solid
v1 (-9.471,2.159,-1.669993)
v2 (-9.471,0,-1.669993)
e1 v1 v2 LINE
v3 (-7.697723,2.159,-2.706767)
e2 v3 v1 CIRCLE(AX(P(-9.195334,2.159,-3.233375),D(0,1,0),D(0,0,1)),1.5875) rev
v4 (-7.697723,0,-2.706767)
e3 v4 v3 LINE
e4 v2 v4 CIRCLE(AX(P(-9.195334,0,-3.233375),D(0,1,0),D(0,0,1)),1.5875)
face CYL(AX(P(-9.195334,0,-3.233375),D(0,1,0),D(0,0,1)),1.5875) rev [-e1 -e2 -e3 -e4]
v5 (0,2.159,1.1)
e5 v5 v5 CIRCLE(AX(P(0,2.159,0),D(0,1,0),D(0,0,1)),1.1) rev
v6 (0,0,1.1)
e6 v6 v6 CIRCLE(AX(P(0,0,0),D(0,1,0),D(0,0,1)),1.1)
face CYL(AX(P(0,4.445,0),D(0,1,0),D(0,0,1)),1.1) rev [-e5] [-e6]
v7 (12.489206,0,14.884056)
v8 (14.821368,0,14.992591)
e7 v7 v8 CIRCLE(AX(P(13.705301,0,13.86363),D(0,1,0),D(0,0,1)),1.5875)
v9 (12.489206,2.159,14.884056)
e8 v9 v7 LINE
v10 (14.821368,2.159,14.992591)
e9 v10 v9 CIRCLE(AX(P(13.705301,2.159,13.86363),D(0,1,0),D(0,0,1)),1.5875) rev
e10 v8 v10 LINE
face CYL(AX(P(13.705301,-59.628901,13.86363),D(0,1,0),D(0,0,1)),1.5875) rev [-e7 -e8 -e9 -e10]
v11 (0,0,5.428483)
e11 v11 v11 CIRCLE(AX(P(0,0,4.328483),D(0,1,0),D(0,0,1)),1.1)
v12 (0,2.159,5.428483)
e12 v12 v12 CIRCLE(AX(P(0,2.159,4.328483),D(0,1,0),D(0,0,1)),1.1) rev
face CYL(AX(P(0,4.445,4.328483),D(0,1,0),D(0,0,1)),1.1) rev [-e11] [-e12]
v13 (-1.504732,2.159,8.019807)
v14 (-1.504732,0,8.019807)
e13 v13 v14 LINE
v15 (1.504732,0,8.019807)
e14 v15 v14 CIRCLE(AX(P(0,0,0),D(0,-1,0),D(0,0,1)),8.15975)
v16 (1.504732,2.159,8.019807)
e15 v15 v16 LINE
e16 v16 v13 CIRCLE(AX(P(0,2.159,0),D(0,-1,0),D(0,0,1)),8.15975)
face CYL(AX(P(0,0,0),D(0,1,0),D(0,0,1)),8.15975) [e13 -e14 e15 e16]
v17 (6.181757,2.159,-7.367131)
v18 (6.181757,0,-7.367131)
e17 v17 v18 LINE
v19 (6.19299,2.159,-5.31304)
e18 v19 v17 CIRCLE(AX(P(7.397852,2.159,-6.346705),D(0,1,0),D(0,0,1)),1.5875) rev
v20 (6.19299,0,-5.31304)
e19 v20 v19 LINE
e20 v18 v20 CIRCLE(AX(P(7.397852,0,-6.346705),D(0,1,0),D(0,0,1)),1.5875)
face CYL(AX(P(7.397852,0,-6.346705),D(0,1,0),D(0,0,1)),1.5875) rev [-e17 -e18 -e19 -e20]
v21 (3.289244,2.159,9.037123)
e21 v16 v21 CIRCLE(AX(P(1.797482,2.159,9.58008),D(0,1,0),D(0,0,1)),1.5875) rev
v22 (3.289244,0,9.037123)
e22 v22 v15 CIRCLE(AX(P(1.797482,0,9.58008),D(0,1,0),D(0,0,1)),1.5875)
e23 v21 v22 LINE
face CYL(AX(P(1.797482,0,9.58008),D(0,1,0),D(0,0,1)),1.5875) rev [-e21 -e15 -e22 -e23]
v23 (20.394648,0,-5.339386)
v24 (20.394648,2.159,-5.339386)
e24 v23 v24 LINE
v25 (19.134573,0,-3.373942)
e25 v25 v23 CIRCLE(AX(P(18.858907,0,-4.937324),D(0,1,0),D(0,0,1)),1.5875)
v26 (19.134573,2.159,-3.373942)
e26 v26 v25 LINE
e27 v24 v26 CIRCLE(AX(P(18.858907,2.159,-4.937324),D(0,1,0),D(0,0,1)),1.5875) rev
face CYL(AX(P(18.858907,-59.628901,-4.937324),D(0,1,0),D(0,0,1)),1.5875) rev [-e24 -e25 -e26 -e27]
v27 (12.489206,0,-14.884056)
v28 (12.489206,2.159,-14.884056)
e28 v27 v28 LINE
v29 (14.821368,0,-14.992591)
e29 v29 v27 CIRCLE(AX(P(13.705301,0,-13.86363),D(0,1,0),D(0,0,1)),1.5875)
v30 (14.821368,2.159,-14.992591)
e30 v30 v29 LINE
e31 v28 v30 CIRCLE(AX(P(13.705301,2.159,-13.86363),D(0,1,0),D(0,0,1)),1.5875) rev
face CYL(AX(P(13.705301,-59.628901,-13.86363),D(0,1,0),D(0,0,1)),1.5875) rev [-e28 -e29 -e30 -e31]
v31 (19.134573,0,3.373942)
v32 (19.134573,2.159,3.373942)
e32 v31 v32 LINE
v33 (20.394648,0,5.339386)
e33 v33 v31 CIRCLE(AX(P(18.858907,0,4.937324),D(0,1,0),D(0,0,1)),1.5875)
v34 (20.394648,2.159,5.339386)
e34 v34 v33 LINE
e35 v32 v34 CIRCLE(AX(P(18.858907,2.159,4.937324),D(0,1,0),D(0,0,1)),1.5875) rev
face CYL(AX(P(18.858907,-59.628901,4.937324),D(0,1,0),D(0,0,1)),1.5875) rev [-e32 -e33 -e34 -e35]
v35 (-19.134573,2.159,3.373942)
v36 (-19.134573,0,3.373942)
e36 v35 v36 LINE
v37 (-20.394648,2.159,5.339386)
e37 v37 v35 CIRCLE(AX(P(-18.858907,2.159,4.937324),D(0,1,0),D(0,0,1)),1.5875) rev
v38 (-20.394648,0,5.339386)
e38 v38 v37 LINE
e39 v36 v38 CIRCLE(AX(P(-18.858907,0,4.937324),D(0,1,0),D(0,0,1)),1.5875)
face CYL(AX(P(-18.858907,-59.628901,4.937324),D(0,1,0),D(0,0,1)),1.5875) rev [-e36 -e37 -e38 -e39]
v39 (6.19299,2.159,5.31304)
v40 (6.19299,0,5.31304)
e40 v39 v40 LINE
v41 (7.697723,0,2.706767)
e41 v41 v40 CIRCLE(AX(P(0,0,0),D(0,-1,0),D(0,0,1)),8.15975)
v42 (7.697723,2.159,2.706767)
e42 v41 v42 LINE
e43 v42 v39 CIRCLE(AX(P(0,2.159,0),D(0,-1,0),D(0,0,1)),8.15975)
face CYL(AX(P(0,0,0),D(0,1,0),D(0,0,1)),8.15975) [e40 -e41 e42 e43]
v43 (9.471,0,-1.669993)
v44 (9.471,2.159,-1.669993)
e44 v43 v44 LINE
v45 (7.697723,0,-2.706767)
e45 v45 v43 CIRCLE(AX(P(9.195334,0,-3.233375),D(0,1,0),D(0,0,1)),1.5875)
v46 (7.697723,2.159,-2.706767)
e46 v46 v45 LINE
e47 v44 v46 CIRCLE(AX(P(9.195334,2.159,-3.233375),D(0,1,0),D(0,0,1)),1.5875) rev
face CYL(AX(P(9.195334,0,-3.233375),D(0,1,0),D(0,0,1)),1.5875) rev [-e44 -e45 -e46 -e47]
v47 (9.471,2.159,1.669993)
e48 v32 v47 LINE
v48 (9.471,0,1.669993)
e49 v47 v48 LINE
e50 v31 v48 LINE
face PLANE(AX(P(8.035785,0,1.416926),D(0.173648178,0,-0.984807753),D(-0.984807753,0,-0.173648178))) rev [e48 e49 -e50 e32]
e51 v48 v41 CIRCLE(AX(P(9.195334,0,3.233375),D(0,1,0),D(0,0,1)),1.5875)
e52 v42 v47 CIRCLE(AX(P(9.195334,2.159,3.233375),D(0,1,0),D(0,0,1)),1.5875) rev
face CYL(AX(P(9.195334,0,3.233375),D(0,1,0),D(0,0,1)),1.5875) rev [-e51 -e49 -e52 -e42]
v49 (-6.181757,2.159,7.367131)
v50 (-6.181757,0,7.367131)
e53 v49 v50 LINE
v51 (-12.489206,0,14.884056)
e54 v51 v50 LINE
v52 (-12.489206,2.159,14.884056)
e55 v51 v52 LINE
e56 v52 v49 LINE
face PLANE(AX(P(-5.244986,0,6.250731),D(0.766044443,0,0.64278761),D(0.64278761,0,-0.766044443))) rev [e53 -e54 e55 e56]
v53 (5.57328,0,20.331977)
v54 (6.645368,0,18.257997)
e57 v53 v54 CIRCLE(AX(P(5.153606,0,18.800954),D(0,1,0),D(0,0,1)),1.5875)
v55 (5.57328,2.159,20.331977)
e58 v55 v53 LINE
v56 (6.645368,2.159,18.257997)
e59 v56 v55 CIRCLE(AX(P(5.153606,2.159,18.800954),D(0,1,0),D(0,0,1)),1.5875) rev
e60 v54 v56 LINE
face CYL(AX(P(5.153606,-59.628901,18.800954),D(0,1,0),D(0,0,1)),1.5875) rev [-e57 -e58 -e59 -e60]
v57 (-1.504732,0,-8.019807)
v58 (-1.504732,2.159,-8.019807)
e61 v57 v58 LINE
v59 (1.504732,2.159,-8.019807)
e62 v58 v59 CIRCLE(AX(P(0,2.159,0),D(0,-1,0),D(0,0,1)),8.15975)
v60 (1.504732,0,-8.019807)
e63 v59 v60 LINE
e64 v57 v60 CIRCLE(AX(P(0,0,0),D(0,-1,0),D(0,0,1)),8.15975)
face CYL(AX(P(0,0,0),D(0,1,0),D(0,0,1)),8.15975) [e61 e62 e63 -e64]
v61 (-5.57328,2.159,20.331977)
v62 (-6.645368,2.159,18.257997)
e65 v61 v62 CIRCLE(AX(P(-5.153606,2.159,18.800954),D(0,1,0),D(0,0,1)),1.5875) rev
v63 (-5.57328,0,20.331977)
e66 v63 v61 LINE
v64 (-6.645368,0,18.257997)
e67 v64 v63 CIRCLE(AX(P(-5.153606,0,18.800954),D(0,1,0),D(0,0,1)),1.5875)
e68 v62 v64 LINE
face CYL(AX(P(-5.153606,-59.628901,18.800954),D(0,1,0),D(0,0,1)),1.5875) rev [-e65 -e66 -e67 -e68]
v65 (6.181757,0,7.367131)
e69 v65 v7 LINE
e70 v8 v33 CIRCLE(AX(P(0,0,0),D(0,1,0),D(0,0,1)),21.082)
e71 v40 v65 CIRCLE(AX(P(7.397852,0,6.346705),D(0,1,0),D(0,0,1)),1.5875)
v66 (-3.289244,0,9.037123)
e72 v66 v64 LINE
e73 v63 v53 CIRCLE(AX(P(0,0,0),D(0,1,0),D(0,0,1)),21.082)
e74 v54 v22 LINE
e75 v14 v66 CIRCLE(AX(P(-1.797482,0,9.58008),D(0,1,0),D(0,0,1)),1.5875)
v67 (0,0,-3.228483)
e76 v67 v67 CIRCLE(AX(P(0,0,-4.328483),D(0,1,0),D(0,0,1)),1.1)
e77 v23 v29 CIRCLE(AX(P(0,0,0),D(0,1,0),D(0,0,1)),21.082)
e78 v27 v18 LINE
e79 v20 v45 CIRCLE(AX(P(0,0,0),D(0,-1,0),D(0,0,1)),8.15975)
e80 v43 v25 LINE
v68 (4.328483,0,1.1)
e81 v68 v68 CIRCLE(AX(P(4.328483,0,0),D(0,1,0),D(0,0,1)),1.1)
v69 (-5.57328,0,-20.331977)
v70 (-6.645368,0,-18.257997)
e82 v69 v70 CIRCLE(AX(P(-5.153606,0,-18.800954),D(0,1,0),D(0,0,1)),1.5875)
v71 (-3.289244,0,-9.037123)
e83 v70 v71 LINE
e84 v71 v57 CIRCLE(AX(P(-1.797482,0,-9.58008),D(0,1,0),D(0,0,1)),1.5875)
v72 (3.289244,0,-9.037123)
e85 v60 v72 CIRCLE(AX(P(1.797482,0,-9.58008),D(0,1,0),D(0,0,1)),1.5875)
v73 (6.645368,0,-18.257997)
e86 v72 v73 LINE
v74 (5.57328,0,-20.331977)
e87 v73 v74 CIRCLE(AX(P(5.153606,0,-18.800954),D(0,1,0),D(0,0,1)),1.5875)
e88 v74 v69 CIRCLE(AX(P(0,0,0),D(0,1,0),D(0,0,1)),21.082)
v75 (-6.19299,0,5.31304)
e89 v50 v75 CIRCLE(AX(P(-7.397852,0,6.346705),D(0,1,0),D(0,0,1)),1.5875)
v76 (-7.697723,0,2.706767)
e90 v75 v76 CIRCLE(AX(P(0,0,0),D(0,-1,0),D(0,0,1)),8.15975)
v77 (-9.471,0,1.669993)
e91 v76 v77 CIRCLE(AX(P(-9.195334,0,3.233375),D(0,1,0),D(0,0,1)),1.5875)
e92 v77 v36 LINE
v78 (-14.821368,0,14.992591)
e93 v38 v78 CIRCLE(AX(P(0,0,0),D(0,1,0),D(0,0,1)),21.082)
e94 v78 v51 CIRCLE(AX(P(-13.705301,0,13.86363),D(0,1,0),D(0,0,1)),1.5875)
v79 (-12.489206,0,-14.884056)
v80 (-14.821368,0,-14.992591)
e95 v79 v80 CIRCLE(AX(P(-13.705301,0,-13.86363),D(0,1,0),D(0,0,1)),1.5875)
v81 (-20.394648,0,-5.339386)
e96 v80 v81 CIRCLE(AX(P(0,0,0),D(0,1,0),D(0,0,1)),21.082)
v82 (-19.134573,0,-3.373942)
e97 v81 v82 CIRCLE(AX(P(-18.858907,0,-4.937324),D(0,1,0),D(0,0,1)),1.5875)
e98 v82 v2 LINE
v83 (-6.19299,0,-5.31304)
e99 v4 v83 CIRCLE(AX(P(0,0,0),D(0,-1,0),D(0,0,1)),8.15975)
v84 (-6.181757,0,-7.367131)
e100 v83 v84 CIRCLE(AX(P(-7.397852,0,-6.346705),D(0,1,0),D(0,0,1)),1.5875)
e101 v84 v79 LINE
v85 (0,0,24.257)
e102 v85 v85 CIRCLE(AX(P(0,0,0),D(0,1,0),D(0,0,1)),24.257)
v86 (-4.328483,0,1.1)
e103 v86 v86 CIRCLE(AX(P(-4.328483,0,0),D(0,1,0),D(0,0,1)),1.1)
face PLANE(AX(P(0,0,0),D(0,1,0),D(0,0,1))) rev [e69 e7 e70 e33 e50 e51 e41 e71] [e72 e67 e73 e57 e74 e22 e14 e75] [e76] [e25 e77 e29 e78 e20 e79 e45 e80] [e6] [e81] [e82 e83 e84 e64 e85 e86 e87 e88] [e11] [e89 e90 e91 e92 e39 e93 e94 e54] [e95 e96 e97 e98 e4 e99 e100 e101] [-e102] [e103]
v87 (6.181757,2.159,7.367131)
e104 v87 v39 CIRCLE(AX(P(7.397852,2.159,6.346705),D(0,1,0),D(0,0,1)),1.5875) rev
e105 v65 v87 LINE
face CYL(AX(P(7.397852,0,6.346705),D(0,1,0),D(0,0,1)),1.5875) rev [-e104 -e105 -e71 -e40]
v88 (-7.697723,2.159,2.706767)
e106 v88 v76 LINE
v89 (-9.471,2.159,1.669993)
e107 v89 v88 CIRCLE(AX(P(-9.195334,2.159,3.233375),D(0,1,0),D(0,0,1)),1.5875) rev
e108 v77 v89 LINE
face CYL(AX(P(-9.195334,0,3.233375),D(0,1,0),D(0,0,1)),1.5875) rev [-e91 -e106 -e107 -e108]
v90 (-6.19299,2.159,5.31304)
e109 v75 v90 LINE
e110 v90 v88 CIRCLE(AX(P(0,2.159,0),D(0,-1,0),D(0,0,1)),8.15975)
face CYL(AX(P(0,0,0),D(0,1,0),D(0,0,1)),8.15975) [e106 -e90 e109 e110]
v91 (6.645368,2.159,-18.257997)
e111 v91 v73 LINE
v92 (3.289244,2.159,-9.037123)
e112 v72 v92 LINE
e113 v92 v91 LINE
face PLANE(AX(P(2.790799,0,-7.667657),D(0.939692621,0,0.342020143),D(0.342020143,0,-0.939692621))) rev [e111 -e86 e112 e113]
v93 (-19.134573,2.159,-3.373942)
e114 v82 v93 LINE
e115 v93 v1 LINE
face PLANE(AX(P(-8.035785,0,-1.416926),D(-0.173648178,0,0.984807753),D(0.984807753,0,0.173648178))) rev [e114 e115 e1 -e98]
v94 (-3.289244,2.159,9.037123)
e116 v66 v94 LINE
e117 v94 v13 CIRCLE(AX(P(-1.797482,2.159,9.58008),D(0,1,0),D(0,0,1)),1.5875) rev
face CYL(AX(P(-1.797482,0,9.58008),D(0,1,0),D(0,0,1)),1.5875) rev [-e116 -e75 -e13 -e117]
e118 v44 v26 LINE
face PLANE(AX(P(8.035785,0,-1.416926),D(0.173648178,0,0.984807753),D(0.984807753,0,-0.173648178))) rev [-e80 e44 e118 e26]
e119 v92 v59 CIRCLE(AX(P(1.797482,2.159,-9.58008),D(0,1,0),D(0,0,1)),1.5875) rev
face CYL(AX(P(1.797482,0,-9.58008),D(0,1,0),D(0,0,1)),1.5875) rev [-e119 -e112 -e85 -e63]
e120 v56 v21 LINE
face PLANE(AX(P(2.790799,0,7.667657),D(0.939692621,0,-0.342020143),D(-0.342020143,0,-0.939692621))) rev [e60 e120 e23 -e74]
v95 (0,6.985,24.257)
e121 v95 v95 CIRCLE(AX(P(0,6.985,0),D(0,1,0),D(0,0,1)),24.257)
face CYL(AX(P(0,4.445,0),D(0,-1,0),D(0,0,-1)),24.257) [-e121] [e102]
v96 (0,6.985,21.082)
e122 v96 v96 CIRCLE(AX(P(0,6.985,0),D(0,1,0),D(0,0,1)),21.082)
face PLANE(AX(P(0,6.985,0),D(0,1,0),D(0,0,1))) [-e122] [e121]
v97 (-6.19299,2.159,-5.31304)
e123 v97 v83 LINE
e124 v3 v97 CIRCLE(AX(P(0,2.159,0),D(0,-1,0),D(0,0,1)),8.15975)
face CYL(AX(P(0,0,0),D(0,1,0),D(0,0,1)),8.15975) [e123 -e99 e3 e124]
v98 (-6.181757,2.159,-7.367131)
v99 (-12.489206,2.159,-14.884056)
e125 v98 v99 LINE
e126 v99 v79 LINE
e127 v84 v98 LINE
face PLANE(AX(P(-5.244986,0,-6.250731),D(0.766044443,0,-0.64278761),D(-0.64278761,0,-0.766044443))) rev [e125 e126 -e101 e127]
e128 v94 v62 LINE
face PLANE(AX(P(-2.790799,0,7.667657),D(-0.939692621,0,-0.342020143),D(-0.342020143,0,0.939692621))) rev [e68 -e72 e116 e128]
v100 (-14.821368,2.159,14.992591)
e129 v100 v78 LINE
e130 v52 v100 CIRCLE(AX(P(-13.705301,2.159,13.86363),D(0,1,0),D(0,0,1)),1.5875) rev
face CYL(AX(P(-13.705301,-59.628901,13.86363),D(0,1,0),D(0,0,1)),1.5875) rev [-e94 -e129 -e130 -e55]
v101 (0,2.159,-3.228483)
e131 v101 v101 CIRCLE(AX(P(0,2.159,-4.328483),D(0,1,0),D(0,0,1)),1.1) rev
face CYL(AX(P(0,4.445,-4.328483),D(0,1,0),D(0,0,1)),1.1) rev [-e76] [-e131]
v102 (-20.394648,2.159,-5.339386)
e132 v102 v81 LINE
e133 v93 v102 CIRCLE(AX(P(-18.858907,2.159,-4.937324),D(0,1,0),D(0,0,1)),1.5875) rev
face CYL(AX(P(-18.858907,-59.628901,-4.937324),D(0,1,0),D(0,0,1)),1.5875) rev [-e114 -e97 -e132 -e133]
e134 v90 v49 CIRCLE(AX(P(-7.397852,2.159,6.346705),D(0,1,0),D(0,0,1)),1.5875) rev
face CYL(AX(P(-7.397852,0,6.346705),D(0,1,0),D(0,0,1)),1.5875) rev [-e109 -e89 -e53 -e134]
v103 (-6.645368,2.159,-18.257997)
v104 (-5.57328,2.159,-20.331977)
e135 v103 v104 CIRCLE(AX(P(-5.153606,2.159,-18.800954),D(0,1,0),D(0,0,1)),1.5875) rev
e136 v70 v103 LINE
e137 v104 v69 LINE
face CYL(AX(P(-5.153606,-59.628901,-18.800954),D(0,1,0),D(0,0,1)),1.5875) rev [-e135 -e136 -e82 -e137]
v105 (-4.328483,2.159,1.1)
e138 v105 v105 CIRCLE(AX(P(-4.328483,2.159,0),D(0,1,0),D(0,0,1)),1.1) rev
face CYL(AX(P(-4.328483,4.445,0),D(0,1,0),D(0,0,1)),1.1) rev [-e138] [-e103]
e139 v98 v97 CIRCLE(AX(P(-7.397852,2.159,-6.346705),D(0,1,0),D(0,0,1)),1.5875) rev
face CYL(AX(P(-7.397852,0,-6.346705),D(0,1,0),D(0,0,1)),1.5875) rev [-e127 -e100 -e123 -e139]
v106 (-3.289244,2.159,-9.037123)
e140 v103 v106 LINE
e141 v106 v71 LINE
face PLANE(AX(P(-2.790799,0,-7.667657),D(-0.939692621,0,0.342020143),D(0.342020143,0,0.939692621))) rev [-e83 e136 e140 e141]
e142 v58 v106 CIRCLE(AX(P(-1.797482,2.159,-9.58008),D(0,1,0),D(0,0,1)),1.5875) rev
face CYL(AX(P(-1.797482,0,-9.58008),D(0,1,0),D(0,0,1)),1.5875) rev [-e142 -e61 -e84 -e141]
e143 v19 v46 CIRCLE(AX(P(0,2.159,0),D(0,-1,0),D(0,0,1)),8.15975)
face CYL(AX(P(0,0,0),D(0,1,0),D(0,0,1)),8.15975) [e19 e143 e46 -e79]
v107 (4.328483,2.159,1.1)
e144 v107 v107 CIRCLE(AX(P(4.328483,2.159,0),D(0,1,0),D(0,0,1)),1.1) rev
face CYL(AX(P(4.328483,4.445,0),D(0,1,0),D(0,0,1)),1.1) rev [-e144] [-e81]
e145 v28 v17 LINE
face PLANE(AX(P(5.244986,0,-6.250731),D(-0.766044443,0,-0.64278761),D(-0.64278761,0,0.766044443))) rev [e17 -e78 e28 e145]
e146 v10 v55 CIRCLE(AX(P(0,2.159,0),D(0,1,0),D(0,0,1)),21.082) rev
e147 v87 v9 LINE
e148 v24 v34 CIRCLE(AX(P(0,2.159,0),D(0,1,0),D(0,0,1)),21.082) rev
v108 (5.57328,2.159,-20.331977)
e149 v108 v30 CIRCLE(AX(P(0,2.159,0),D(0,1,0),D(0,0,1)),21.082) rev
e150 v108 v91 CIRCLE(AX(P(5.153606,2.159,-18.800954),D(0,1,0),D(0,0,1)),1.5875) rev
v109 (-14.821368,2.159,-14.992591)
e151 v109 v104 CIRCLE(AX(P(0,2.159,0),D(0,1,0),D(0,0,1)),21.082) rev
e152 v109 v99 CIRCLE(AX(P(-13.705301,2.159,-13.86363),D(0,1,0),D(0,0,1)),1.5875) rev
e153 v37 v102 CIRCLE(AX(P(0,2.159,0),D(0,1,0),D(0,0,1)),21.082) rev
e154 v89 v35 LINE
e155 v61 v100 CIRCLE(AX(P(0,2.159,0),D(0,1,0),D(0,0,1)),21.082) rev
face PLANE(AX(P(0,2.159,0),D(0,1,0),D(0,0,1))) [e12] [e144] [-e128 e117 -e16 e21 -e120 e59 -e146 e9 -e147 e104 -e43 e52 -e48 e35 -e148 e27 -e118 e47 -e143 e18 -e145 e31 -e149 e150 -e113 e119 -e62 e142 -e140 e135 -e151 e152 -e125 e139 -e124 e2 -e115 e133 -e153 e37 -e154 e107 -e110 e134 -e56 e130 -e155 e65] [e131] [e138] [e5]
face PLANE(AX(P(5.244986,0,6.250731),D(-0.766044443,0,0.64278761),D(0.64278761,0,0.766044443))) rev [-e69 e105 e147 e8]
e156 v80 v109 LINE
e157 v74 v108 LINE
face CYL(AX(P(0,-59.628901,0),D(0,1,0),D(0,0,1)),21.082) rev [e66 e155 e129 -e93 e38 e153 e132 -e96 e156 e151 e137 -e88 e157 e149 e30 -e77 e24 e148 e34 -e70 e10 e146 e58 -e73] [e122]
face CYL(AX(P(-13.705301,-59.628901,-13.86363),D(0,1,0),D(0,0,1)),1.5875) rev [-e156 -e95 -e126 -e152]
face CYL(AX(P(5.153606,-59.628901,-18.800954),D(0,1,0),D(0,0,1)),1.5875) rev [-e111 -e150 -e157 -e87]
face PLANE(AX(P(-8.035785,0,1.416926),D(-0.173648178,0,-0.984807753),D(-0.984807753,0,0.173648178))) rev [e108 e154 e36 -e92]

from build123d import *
from build123d.topology import SkipClean

# Parameters (mm, degrees)
SKETCH1_R            = 24.257
BOSS_EXTRUDE1_DEPTH  = 4.445
M2_CLEARANCE_HOLE1_D = 2.2
SKETCH4_R            = 21.082
CUT_EXTRUDE1_DEPTH   = 2.286
CUT_EXTRUDE2_DEPTH   = 35.380661628
FILLET1_DEPTH        = 2.159
BOSS_EXTRUDE2_START  = 2.54
SKETCH6_R            = 24.257
SKETCH6_R_2          = 21.082
BOSS_EXTRUDE2_DEPTH  = 2.54


with BuildPart() as part:
    # Sketch1 → Boss-Extrude1 (new body)
    with BuildSketch(Plane(origin=(0, 0, 0), x_dir=(1, 0, 0), z_dir=(0, 1, 0))):
        with Locations(Location((0, 0, 0), (0, 0, 270))):
            Circle(SKETCH1_R)
    extrude(amount=BOSS_EXTRUDE1_DEPTH)

    # M2 Clearance Hole1 (through all)
    with Locations(Plane(origin=(0, 4.445, 0), x_dir=(1, 0, 0), z_dir=(0, 1, 0))):
        with Locations((0, 0), (0, 4.32848345), (0, -4.32848345), (-4.32848345, 0), (4.32848345, 0)):
            Hole(M2_CLEARANCE_HOLE1_D / 2)

    # Sketch4 → Cut-Extrude1 (cut)
    with BuildSketch(Plane(origin=(0, 4.445, 0), x_dir=(1, 0, 0), z_dir=(0, 1, 0))):
        with Locations(Location((0, 0, 0), (0, 0, 270))):
            Circle(SKETCH4_R)
    extrude(amount=-CUT_EXTRUDE1_DEPTH, mode=Mode.SUBTRACT)

    # Sketch5 → Cut-Extrude2 (cut, through all)
    with SkipClean():  # the faces are left unmerged after this step: merging them gives an invalid solid
        with BuildSketch(Plane(origin=(0, 2.159, 0), x_dir=(1, 0, 0), z_dir=(0, 1, 0))):
            with BuildLine():
                Line((-2.790798865, 7.667656862), (-7.210468662, 19.810599831))
                ThreePointArc((-7.210468662, 19.810599831), (0, 21.082), (7.210468662, 19.810599831))
                Line((7.210468662, 19.810599831), (2.790798865, 7.667656862))
                ThreePointArc((2.790798865, 7.667656862), (0, 8.15975), (-2.790798865, 7.667656862))
            make_face()
            with BuildLine():
                Line((5.244986198, 6.250731145), (13.551248387, 16.14974895))
                ThreePointArc((13.551248387, 16.14974895), (18.257547563, 10.541), (20.761717049, 3.660850882))
                Line((20.761717049, 3.660850882), (8.035785063, 1.416925718))
                ThreePointArc((8.035785063, 1.416925718), (7.066550789, 4.079875), (5.244986198, 6.250731145))
            make_face()
            with BuildLine():
                Line((8.035785063, -1.416925718), (20.761717049, -3.660850882))
                ThreePointArc((20.761717049, -3.660850882), (18.257547563, -10.541), (13.551248387, -16.14974895))
                Line((13.551248387, -16.14974895), (5.244986198, -6.250731145))
                ThreePointArc((5.244986198, -6.250731145), (7.066550789, -4.079875), (8.035785063, -1.416925718))
            make_face()
            with BuildLine():
                Line((2.790798865, -7.667656862), (7.210468662, -19.810599831))
                ThreePointArc((7.210468662, -19.810599831), (0, -21.082), (-7.210468662, -19.810599831))
                Line((-7.210468662, -19.810599831), (-2.790798865, -7.667656862))
                ThreePointArc((-2.790798865, -7.667656862), (0, -8.15975), (2.790798865, -7.667656862))
            make_face()
            with BuildLine():
                Line((-5.244986198, -6.250731145), (-13.551248387, -16.14974895))
                ThreePointArc((-13.551248387, -16.14974895), (-18.257547563, -10.541), (-20.761717049, -3.660850882))
                Line((-20.761717049, -3.660850882), (-8.035785063, -1.416925718))
                ThreePointArc((-8.035785063, -1.416925718), (-7.066550789, -4.079875), (-5.244986198, -6.250731145))
            make_face()
            with BuildLine():
                Line((-8.035785063, 1.416925718), (-20.761717049, 3.660850882))
                ThreePointArc((-20.761717049, 3.660850882), (-18.257547563, 10.541), (-13.551248387, 16.14974895))
                Line((-13.551248387, 16.14974895), (-5.244986198, 6.250731145))
                ThreePointArc((-5.244986198, 6.250731145), (-7.066550789, 4.079875), (-8.035785063, 1.416925718))
            make_face()
        extrude(amount=-CUT_EXTRUDE2_DEPTH, mode=Mode.SUBTRACT)

    # Fillet1: read off the stored shape, not the designer's step
    # Fillet1 outline → Fillet1 (add)
    with SkipClean():  # the faces are left unmerged after this step: merging them gives an invalid solid
        with BuildSketch(Plane(origin=(0, 0, 0), x_dir=(1, 0, 0), z_dir=(0, 1, 0))):
            with BuildLine():
                ThreePointArc((-5.573280223, -20.331976578), (-6.563834268, -19.529933732), (-6.645367543, -18.257997268))
                Line((-6.645367543, -18.257997268), (-7.210468662, -19.810599831))
                ThreePointArc((-7.210468662, -19.810599831), (-6.397188235, -20.087974181), (-5.573280223, -20.331976578))
            make_face()
            with BuildLine():
                Line((-2.790798865, -7.667656862), (-3.289243946, -9.037123468))
                ThreePointArc((-3.289243946, -9.037123468), (-2.583701402, -8.200944789), (-1.504732413, -8.019806757))
                ThreePointArc((-1.504732413, -8.019806757), (-2.154970911, -7.870045771), (-2.790798865, -7.667656862))
            make_face()
            with BuildLine():
                ThreePointArc((6.645367543, -18.257997268), (6.563834268, -19.529933732), (5.573280223, -20.331976578))
                ThreePointArc((5.573280223, -20.331976578), (6.397188235, -20.087974181), (7.210468662, -19.810599831))
                Line((7.210468662, -19.810599831), (6.645367543, -18.257997268))
            make_face()
            with BuildLine():
                ThreePointArc((-14.821368114, -14.992590544), (-14.198101834, -15.584114615), (-13.551248387, -16.14974895))
                Line((-13.551248387, -16.14974895), (-12.489205685, -14.884055743))
                ThreePointArc((-12.489205685, -14.884055743), (-13.631501612, -15.449414088), (-14.821368114, -14.992590544))
            make_face()
            with BuildLine():
                ThreePointArc((2.790798865, -7.667656862), (2.154970911, -7.870045771), (1.504732413, -8.019806757))
                ThreePointArc((1.504732413, -8.019806757), (2.583701402, -8.200944789), (3.289243946, -9.037123468))
                Line((3.289243946, -9.037123468), (2.790798865, -7.667656862))
            make_face()
            with BuildLine():
                Line((12.489205685, -14.884055743), (13.551248387, -16.14974895))
                ThreePointArc((13.551248387, -16.14974895), (14.198101834, -15.584114615), (14.821368114, -14.992590544))
                ThreePointArc((14.821368114, -14.992590544), (13.631501612, -15.449414088), (12.489205685, -14.884055743))
            make_face()
            with BuildLine():
                ThreePointArc((-6.192990179, -5.313039875), (-5.810375821, -6.338023444), (-6.181756528, -7.36713055))
                Line((-6.181756528, -7.36713055), (-5.244986198, -6.250731145))
                ThreePointArc((-5.244986198, -6.250731145), (-5.738174111, -5.801282439), (-6.192990179, -5.313039875))
            make_face()
            with BuildLine():
                ThreePointArc((-20.761717049, -3.660850882), (-20.595290068, -4.503859567), (-20.394648337, -5.339386034))
                ThreePointArc((-20.394648337, -5.339386034), (-20.19533588, -4.080519643), (-19.134573227, -3.373941524))
                Line((-19.134573227, -3.373941524), (-20.761717049, -3.660850882))
            make_face()
            with BuildLine():
                Line((5.244986198, -6.250731145), (6.181756528, -7.36713055))
                ThreePointArc((6.181756528, -7.36713055), (5.810375821, -6.338023444), (6.192990179, -5.313039875))
                ThreePointArc((6.192990179, -5.313039875), (5.738174111, -5.801282439), (5.244986198, -6.250731145))
            make_face()
            with BuildLine():
                ThreePointArc((19.134573227, -3.373941524), (20.19533588, -4.080519643), (20.394648337, -5.339386034))
                ThreePointArc((20.394648337, -5.339386034), (20.595290068, -4.503859567), (20.761717049, -3.660850882))
                Line((20.761717049, -3.660850882), (19.134573227, -3.373941524))
            make_face()
            with BuildLine():
                ThreePointArc((-9.471000473, -1.669992918), (-8.394077223, -1.862921344), (-7.697722592, -2.706766883))
                ThreePointArc((-7.697722592, -2.706766883), (-7.893145022, -2.068763332), (-8.035785063, -1.416925718))
                Line((-8.035785063, -1.416925718), (-9.471000473, -1.669992918))
            make_face()
            with BuildLine():
                ThreePointArc((-20.394648337, 5.339386034), (-20.595290068, 4.503859567), (-20.761717049, 3.660850882))
                Line((-20.761717049, 3.660850882), (-19.134573227, 3.373941524))
                ThreePointArc((-19.134573227, 3.373941524), (-20.19533588, 4.080519643), (-20.394648337, 5.339386034))
            make_face()
            with BuildLine():
                ThreePointArc((8.035785063, -1.416925718), (7.893145022, -2.068763332), (7.697722592, -2.706766883))
                ThreePointArc((7.697722592, -2.706766883), (8.394077223, -1.862921344), (9.471000473, -1.669992918))
                Line((9.471000473, -1.669992918), (8.035785063, -1.416925718))
            make_face()
            with BuildLine():
                ThreePointArc((-7.697722592, 2.706766883), (-8.394077223, 1.862921344), (-9.471000473, 1.669992918))
                Line((-9.471000473, 1.669992918), (-8.035785063, 1.416925718))
                ThreePointArc((-8.035785063, 1.416925718), (-7.893145022, 2.068763332), (-7.697722592, 2.706766883))
            make_face()
            with BuildLine():
                ThreePointArc((-13.551248387, 16.14974895), (-14.198101834, 15.584114615), (-14.821368114, 14.992590544))
                ThreePointArc((-14.821368114, 14.992590544), (-13.631501612, 15.449414088), (-12.489205685, 14.884055743))
                Line((-12.489205685, 14.884055743), (-13.551248387, 16.14974895))
            make_face()
            with BuildLine():
                Line((19.134573227, 3.373941524), (20.761717049, 3.660850882))
                ThreePointArc((20.761717049, 3.660850882), (20.595290068, 4.503859567), (20.394648337, 5.339386034))
                ThreePointArc((20.394648337, 5.339386034), (20.19533588, 4.080519643), (19.134573227, 3.373941524))
            make_face()
            with BuildLine():
                ThreePointArc((-6.181756528, 7.36713055), (-5.810375821, 6.338023444), (-6.192990179, 5.313039875))
                ThreePointArc((-6.192990179, 5.313039875), (-5.738174111, 5.801282439), (-5.244986198, 6.250731145))
                Line((-5.244986198, 6.250731145), (-6.181756528, 7.36713055))
            make_face()
            with BuildLine():
                ThreePointArc((-5.573280223, 20.331976578), (-6.397188235, 20.087974181), (-7.210468662, 19.810599831))
                Line((-7.210468662, 19.810599831), (-6.645367543, 18.257997268))
                ThreePointArc((-6.645367543, 18.257997268), (-6.563834268, 19.529933732), (-5.573280223, 20.331976578))
            make_face()
            with BuildLine():
                Line((8.035785063, 1.416925718), (9.471000473, 1.669992918))
                ThreePointArc((9.471000473, 1.669992918), (8.394077223, 1.862921344), (7.697722592, 2.706766883))
                ThreePointArc((7.697722592, 2.706766883), (7.893145022, 2.068763332), (8.035785063, 1.416925718))
            make_face()
            with BuildLine():
                ThreePointArc((12.489205685, 14.884055743), (13.631501612, 15.449414088), (14.821368114, 14.992590544))
                ThreePointArc((14.821368114, 14.992590544), (14.198101834, 15.584114615), (13.551248387, 16.14974895))
                Line((13.551248387, 16.14974895), (12.489205685, 14.884055743))
            make_face()
            with BuildLine():
                ThreePointArc((-1.504732413, 8.019806757), (-2.583701402, 8.200944789), (-3.289243946, 9.037123468))
                Line((-3.289243946, 9.037123468), (-2.790798865, 7.667656862))
                ThreePointArc((-2.790798865, 7.667656862), (-2.154970911, 7.870045771), (-1.504732413, 8.019806757))
            make_face()
            with BuildLine():
                ThreePointArc((7.210468662, 19.810599831), (6.397188235, 20.087974181), (5.573280223, 20.331976578))
                ThreePointArc((5.573280223, 20.331976578), (6.563834268, 19.529933732), (6.645367543, 18.257997268))
                Line((6.645367543, 18.257997268), (7.210468662, 19.810599831))
            make_face()
            with BuildLine():
                ThreePointArc((5.244986198, 6.250731145), (5.738174111, 5.801282439), (6.192990179, 5.313039875))
                ThreePointArc((6.192990179, 5.313039875), (5.810375821, 6.338023444), (6.181756528, 7.36713055))
                Line((6.181756528, 7.36713055), (5.244986198, 6.250731145))
            make_face()
            with BuildLine():
                ThreePointArc((3.289243946, 9.037123468), (2.583701402, 8.200944789), (1.504732413, 8.019806757))
                ThreePointArc((1.504732413, 8.019806757), (2.154970911, 7.870045771), (2.790798865, 7.667656862))
                Line((2.790798865, 7.667656862), (3.289243946, 9.037123468))
            make_face()
        extrude(amount=FILLET1_DEPTH)

    # Sketch6 → Boss-Extrude2 (add)
    with SkipClean():  # the faces are left unmerged after this step: merging them gives an invalid solid
        with BuildSketch(Plane(origin=(0, 4.445, 0), x_dir=(1, 0, 0), z_dir=(0, 1, 0)).offset(BOSS_EXTRUDE2_START)):
            with Locations(Location((0, 0, 0), (0, 0, 270))):
                Circle(SKETCH6_R)
            with Locations(Location((0, 0, 0), (0, 0, 270))):
                Circle(SKETCH6_R_2, mode=Mode.SUBTRACT)
        extrude(amount=-BOSS_EXTRUDE2_DEPTH)


solid = part.part
